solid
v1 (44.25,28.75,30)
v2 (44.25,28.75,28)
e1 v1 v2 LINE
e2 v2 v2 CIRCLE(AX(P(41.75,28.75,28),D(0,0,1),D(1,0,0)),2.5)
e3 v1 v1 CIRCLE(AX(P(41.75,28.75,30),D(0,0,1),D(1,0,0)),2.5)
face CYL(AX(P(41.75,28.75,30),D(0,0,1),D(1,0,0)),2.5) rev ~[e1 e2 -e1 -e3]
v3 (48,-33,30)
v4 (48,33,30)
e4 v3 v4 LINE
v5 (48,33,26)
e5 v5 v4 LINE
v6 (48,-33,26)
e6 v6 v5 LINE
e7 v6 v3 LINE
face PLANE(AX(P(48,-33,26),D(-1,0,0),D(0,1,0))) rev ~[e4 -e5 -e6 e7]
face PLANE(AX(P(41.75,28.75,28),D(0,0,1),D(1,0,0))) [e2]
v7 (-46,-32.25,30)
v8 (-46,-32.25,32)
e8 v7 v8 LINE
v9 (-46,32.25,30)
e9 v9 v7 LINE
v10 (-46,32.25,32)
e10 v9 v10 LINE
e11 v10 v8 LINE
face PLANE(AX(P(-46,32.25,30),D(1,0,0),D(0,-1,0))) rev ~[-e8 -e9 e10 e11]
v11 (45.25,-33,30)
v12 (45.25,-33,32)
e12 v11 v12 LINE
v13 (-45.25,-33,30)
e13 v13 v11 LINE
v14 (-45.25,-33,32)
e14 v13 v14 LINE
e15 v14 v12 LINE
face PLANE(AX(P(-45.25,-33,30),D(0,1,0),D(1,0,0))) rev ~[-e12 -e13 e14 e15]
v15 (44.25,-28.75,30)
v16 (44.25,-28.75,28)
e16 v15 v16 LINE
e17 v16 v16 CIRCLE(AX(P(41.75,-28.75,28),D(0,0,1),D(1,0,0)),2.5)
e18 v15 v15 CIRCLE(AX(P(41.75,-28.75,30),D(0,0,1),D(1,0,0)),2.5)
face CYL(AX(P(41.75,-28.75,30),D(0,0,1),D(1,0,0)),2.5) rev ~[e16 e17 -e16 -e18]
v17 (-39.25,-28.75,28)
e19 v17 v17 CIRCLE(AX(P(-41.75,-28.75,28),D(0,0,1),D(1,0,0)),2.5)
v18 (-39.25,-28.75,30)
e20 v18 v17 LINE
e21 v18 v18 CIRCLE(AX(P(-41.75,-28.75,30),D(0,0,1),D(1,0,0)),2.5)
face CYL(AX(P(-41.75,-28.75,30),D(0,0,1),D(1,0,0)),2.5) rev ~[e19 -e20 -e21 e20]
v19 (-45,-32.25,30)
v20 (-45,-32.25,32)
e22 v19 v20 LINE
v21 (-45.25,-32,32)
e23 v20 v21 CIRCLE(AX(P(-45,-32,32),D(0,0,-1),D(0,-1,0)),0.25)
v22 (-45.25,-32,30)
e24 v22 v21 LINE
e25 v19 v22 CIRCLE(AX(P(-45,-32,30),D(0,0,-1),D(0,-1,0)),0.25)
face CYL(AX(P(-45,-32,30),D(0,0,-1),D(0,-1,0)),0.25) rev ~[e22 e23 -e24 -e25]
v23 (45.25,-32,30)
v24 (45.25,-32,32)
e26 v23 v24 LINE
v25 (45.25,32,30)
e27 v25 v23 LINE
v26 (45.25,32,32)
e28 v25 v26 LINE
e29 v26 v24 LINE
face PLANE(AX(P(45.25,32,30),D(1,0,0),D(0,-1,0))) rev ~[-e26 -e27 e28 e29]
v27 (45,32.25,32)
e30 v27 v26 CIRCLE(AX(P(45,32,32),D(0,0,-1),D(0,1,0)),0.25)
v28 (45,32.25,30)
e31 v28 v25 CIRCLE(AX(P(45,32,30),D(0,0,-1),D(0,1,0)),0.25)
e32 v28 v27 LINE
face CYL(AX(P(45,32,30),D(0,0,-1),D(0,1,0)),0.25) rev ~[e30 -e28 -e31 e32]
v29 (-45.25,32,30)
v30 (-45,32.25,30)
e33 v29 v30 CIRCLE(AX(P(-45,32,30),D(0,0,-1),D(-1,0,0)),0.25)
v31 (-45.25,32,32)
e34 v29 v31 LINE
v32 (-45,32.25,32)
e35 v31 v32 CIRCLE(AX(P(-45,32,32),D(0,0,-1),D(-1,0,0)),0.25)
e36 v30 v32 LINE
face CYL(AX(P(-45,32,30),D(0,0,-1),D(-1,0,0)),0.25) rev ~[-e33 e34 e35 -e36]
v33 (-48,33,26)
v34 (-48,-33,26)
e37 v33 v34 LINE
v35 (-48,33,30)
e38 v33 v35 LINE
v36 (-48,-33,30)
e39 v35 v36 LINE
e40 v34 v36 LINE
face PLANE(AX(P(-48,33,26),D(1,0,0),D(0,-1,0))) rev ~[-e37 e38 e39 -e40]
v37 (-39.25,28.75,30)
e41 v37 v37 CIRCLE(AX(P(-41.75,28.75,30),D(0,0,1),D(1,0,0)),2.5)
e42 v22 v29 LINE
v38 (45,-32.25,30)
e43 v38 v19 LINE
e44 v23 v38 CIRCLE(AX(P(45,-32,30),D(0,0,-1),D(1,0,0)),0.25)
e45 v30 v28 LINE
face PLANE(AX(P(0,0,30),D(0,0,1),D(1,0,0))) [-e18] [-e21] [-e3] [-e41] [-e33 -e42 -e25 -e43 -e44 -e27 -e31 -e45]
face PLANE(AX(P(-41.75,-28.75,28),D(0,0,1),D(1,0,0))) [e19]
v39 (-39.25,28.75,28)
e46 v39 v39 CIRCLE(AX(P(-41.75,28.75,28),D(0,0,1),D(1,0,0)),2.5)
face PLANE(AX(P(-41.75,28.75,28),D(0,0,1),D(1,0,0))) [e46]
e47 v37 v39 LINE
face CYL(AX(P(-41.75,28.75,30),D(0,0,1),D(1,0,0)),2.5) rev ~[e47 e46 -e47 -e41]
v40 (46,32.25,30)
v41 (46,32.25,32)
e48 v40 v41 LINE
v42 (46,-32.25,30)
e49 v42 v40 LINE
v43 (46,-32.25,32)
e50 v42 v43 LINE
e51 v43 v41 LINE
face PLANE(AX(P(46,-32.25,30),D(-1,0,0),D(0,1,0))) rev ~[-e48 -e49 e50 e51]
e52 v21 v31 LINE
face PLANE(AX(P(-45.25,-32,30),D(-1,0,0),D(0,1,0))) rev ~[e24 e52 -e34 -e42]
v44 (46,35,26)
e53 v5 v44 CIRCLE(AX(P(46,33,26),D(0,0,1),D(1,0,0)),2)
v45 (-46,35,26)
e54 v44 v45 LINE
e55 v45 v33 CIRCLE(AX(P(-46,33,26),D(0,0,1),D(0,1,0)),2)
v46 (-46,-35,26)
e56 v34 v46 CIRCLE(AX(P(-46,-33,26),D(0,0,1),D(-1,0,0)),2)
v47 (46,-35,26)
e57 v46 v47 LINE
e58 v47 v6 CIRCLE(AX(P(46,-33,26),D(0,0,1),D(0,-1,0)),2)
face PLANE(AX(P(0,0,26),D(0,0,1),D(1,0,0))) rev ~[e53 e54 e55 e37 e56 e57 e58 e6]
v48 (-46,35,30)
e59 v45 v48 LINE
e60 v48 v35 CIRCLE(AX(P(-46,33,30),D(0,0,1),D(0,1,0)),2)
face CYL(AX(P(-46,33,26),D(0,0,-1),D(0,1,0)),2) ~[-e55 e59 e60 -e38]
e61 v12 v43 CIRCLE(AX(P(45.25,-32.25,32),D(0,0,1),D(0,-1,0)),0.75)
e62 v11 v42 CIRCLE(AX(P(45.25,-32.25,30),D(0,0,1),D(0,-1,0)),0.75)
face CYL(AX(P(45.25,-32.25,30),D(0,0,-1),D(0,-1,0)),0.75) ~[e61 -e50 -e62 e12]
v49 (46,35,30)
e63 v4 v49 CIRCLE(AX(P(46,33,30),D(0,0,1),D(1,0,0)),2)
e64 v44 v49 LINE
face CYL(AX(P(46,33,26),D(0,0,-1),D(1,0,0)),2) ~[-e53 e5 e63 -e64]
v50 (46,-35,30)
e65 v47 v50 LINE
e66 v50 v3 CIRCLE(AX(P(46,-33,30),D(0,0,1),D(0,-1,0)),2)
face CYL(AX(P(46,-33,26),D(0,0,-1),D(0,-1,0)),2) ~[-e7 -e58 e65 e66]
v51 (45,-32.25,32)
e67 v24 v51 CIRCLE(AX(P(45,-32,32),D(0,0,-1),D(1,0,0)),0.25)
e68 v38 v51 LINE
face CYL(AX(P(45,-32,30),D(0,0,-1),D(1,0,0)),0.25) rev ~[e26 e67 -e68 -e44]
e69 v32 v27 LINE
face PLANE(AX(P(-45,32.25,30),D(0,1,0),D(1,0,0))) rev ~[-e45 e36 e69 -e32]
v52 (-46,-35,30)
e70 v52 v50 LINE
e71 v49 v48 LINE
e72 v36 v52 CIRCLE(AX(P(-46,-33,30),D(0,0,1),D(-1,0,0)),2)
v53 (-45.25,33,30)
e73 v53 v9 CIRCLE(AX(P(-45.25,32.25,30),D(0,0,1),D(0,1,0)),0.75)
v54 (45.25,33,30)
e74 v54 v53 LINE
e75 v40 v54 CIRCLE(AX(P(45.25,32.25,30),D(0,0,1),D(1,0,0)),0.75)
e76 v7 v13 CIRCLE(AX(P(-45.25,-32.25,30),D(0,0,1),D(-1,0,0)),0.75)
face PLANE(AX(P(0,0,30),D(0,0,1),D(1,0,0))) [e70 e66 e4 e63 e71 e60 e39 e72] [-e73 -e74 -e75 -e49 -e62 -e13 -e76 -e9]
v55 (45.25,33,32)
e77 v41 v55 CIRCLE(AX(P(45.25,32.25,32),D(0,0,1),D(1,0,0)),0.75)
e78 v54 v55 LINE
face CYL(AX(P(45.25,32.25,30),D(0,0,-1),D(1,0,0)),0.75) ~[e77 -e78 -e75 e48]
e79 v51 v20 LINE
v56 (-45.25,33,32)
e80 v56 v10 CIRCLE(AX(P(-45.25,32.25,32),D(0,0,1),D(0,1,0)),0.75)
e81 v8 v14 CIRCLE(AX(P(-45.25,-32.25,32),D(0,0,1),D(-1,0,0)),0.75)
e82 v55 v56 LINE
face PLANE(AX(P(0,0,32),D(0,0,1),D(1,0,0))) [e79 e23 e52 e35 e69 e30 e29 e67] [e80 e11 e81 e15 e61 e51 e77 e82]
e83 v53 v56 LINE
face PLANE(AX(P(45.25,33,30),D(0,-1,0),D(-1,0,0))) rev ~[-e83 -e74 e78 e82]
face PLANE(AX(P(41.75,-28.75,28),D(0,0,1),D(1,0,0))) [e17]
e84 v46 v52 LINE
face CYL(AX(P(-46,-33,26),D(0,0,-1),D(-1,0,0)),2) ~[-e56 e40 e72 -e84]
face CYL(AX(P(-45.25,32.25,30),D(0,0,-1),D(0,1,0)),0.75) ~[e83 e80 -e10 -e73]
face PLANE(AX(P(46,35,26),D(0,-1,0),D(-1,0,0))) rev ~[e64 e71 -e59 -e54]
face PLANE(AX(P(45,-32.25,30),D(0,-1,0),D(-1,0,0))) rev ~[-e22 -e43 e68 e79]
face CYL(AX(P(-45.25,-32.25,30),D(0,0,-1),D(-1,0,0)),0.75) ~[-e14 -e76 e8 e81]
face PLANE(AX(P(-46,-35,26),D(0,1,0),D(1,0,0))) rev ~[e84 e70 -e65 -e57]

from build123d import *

# Parameters (mm, degrees)
F1_DEPTH  = 26
F2_DEPTH  = 4
F3_W      = 90
F3_H      = 64
F4_DEPTH  = 2
F6_DEPTH  = 2
F7_R      = 2.5
F8_DEPTH  = 2
F9_R      = 2.5
F10_DEPTH = 2
F11_W     = 5
F11_H     = 50
F11_W_2   = 76
F11_H_2   = 5
F12_DEPTH = 22
F13_R     = 1
F14_DEPTH = 5
F15_R     = 11
F15_R_2   = 5
F16_DEPTH = 2
F17_DEPTH = 5
F19_W     = 20.16
F19_H     = 11.52
F19_R     = 3
F19_R_2   = 2
F20_DEPTH = 5
F19_W_2   = 66
F19_H_2   = 18
F19_R_3   = 1.8
F21_DEPTH = 3
F22_DEPTH = 3
F19_R_4   = 0.8
F23_DEPTH = 1.9
F24_DEPTH = 1.9
F25_DEPTH = 1.9


# Not quite as in the source:
# - a feature names something its author has since deleted; it is built from what else it names


with BuildPart() as f1:
    # F0 (on Top) → F1 (new body)
    with BuildSketch(Plane.XY):
        with BuildLine():
            Line((46, 35), (-46, 35))
            ThreePointArc((-46, 35), (-47.4142135624, 34.4142135624), (-48, 33))
            Line((-48, 33), (-48, -33))
            ThreePointArc((-48, -33), (-47.4142135624, -34.4142135624), (-46, -35))
            Line((-46, -35), (46, -35))
            ThreePointArc((46, -35), (47.4142135624, -34.4142135624), (48, -33))
            Line((48, -33), (48, 33))
            ThreePointArc((48, 33), (47.4142135624, 34.4142135624), (46, 35))
        make_face()
    extrude(amount=F1_DEPTH)


with BuildPart() as f2:
    # F2 (new): a face of the model
    f2_faces = [f1.part.faces().sort_by_distance(p)[0] for p in [
        (0, 0, 26),
    ]]
    extrude(f2_faces, amount=F2_DEPTH)

    # F5 (on face) → F6 (join)
    with BuildSketch(Plane.XY.offset(30)):
        with BuildLine():
            Line((45.25, 33), (-45.25, 33))
            ThreePointArc((-45.25, 33), (-45.7803300859, 32.7803300859), (-46, 32.25))
            Line((-46, 32.25), (-46, -32.25))
            ThreePointArc((-46, -32.25), (-45.7803300859, -32.7803300859), (-45.25, -33))
            Line((-45.25, -33), (45.25, -33))
            ThreePointArc((45.25, -33), (45.7803300859, -32.7803300859), (46, -32.25))
            Line((46, -32.25), (46, 32.25))
            ThreePointArc((46, 32.25), (45.7803300859, 32.7803300859), (45.25, 33))
        make_face()
        with BuildLine():
            ThreePointArc((-45.25, 32), (-45.1767766953, 32.1767766953), (-45, 32.25))
            Line((-45, 32.25), (45, 32.25))
            ThreePointArc((45, 32.25), (45.1767766953, 32.1767766953), (45.25, 32))
            Line((45.25, 32), (45.25, -32))
            ThreePointArc((45.25, -32), (45.1767766953, -32.1767766953), (45, -32.25))
            Line((45, -32.25), (-45, -32.25))
            ThreePointArc((-45, -32.25), (-45.1767766953, -32.1767766953), (-45.25, -32))
            Line((-45.25, -32), (-45.25, 32))
        make_face(mode=Mode.SUBTRACT)
    extrude(amount=F6_DEPTH)

    # F9 (on face) → F10 (cut)
    with BuildSketch(Plane.XY.offset(30)):
        with Locations((-41.75, -28.75)):
            Circle(F9_R)
        with Locations((-41.75, 28.75)):
            Circle(F9_R)
        with Locations((41.75, 28.75)):
            Circle(F9_R)
        with Locations((41.75, -28.75)):
            Circle(F9_R)
    extrude(amount=-F10_DEPTH, mode=Mode.SUBTRACT)


with BuildPart() as f1_1:
    add(f1.part)

    # F3 (on face) → F4 (cut)
    with BuildSketch(Plane.XY.offset(26)):
        with BuildLine():
            Line((45, 33), (-45, 33))
            ThreePointArc((-45, 33), (-45.7071067812, 32.7071067812), (-46, 32))
            Line((-46, 32), (-46, -32))
            ThreePointArc((-46, -32), (-45.7071067812, -32.7071067812), (-45, -33))
            Line((-45, -33), (45, -33))
            ThreePointArc((45, -33), (45.7071067812, -32.7071067812), (46, -32))
            Line((46, -32), (46, 32))
            ThreePointArc((46, 32), (45.7071067812, 32.7071067812), (45, 33))
        make_face()
        Rectangle(F3_W, F3_H, mode=Mode.SUBTRACT)
    extrude(amount=-F4_DEPTH, mode=Mode.SUBTRACT)

    # F7 (on face) → F8 (cut)
    with BuildSketch(Plane.XY.offset(26)):
        with Locations((-41.5, -28.5)):
            Circle(F7_R)
        with Locations((-41.4999984205, 28.5)):
            Circle(F7_R)
        with Locations((41.5, 28.5)):
            Circle(F7_R)
        with Locations((41.5, -28.5)):
            Circle(F7_R)
    extrude(amount=-F8_DEPTH, mode=Mode.SUBTRACT)

    # F11 (on face) → F12 (cut)
    with BuildSketch(Plane.XY.offset(26)):
        with Locations((-40.5, 0)):
            Rectangle(F11_W, F11_H)
        with Locations((0, -27.5)):
            Rectangle(F11_W_2, F11_H_2)
        Rectangle(F11_W_2, F11_H)
        with Locations((0, 27.5)):
            Rectangle(F11_W_2, F11_H_2)
        with Locations((40.5, 0)):
            Rectangle(F11_W, F11_H)
    extrude(amount=-F12_DEPTH, mode=Mode.SUBTRACT)

    # F13 (on face) → F14 (cut, through all)
    with BuildSketch(Plane.YZ.offset(48)):
        with Locations((7.9999985173, 14.5000000224)):
            Circle(F13_R)
        with Locations((7.9999985173, 11.5000000224)):
            Circle(F13_R)
        with Locations((10.9999985173, 11.5000000224)):
            Circle(F13_R)
        with Locations((10.9999985173, 14.5000000224)):
            Circle(F13_R)
        with Locations((13.9999985173, 14.5000000224)):
            Circle(F13_R)
        with Locations((13.9999985173, 11.5000000224)):
            Circle(F13_R)
    extrude(amount=-F14_DEPTH, mode=Mode.SUBTRACT)

    # F15 (on face) → F16 (cut)
    with BuildSketch(Plane(origin=(-48, 0, 0), x_dir=(0, -1, 0), z_dir=(-1, 0, 0))):
        with Locations((6.9999988191, 12.5000002682)):
            Circle(F15_R)
        with Locations((6.9999988191, 12.5000002682)):
            Circle(F15_R_2, mode=Mode.SUBTRACT)
    extrude(amount=-F16_DEPTH, mode=Mode.SUBTRACT)

    # F15 (on face) → F17 (cut, through all)
    with BuildSketch(Plane(origin=(-48, 0, 0), x_dir=(0, -1, 0), z_dir=(-1, 0, 0))):
        with Locations((6.9999988191, 12.5000002682)):
            Circle(F15_R_2)
    extrude(amount=-F17_DEPTH, mode=Mode.SUBTRACT)

    # F19 (on face) → F20 (cut, through all)
    with BuildSketch(Plane(origin=(0, -30, 0), x_dir=(-1, 0, 0), z_dir=(0, 1, 0))):
        with Locations((4.7299169147, 14.0678631142)):
            Rectangle(F19_W, F19_H)
        with Locations((28.8399169147, 14.0678631142)):
            Circle(F19_R)
        with Locations((-11.1500830853, 14.0678631142)):
            Circle(F19_R_2)
        with Locations((-17.7100830853, 14.0678631142)):
            Circle(F19_R_2)
        with Locations((-24.2600830853, 14.0678631142)):
            Circle(F19_R_2)
        with BuildLine():
            ThreePointArc((-30.8900830853, 11.0678631142), (-30.5971898665, 10.360756333), (-29.8900830853, 10.0678631142))
            Line((-29.8900830853, 10.0678631142), (-28.9900830853, 10.0678631142))
            ThreePointArc((-28.9900830853, 10.0678631142), (-28.2829763041, 10.360756333), (-27.9900830853, 11.0678631142))
            Line((-27.9900830853, 11.0678631142), (-27.9900830853, 17.0678631142))
            ThreePointArc((-27.9900830853, 17.0678631142), (-28.2829763041, 17.7749698954), (-28.9900830853, 18.0678631142))
            Line((-28.9900830853, 18.0678631142), (-29.8900830853, 18.0678631142))
            ThreePointArc((-29.8900830853, 18.0678631142), (-30.5971898665, 17.7749698954), (-30.8900830853, 17.0678631142))
            Line((-30.8900830853, 17.0678631142), (-30.8900830853, 11.0678631142))
        make_face()
    extrude(amount=-F20_DEPTH, mode=Mode.SUBTRACT)

    # F19 (on face) → F21 (cut)
    with BuildSketch(Plane(origin=(0, -30, 0), x_dir=(-1, 0, 0), z_dir=(0, 1, 0))):
        with Locations((-0.1600830853, 14.0678631142)):
            Rectangle(F19_W_2, F19_H_2)
        with Locations((-24.0000830853, 7.5678631142)):
            Circle(F19_R_3, mode=Mode.SUBTRACT)
        with BuildLine():
            Line((-28.9900830853, 10.0678631142), (-29.8900830853, 10.0678631142))
            ThreePointArc((-29.8900830853, 10.0678631142), (-30.5971898665, 10.360756333), (-30.8900830853, 11.0678631142))
            Line((-30.8900830853, 11.0678631142), (-30.8900830853, 17.0678631142))
            ThreePointArc((-30.8900830853, 17.0678631142), (-30.5971898665, 17.7749698954), (-29.8900830853, 18.0678631142))
            Line((-29.8900830853, 18.0678631142), (-28.9900830853, 18.0678631142))
            ThreePointArc((-28.9900830853, 18.0678631142), (-28.2829763041, 17.7749698954), (-27.9900830853, 17.0678631142))
            Line((-27.9900830853, 17.0678631142), (-27.9900830853, 11.0678631142))
            ThreePointArc((-27.9900830853, 11.0678631142), (-28.2829763041, 10.360756333), (-28.9900830853, 10.0678631142))
        make_face(mode=Mode.SUBTRACT)
        with Locations((-24.2600830853, 14.0678631142)):
            Circle(F19_R_2, mode=Mode.SUBTRACT)
        with Locations((-17.7100830853, 14.0678631142)):
            Circle(F19_R_2, mode=Mode.SUBTRACT)
        with Locations((-11.1500830853, 14.0678631142)):
            Circle(F19_R_2, mode=Mode.SUBTRACT)
        with Locations((30.1799169147, 7.5678631142)):
            Circle(F19_R_3, mode=Mode.SUBTRACT)
        with Locations((4.7299169147, 14.0678631142)):
            Rectangle(F19_W, F19_H, mode=Mode.SUBTRACT)
        with Locations((28.8399169147, 14.0678631142)):
            Circle(F19_R, mode=Mode.SUBTRACT)
        with Locations((30.1799169147, 20.5678631142)):
            Circle(F19_R_3, mode=Mode.SUBTRACT)
    extrude(amount=F21_DEPTH, mode=Mode.SUBTRACT)

    # F19 (on face) → F22 (cut)
    with BuildSketch(Plane(origin=(0, -30, 0), x_dir=(-1, 0, 0), z_dir=(0, 1, 0))):
        with Locations((-0.1600830853, 14.0678631142)):
            Rectangle(F19_W_2, F19_H_2)
        with Locations((-24.0000830853, 7.5678631142)):
            Circle(F19_R_3, mode=Mode.SUBTRACT)
        with BuildLine():
            Line((-28.9900830853, 10.0678631142), (-29.8900830853, 10.0678631142))
            ThreePointArc((-29.8900830853, 10.0678631142), (-30.5971898665, 10.360756333), (-30.8900830853, 11.0678631142))
            Line((-30.8900830853, 11.0678631142), (-30.8900830853, 17.0678631142))
            ThreePointArc((-30.8900830853, 17.0678631142), (-30.5971898665, 17.7749698954), (-29.8900830853, 18.0678631142))
            Line((-29.8900830853, 18.0678631142), (-28.9900830853, 18.0678631142))
            ThreePointArc((-28.9900830853, 18.0678631142), (-28.2829763041, 17.7749698954), (-27.9900830853, 17.0678631142))
            Line((-27.9900830853, 17.0678631142), (-27.9900830853, 11.0678631142))
            ThreePointArc((-27.9900830853, 11.0678631142), (-28.2829763041, 10.360756333), (-28.9900830853, 10.0678631142))
        make_face(mode=Mode.SUBTRACT)
        with Locations((-24.2600830853, 14.0678631142)):
            Circle(F19_R_2, mode=Mode.SUBTRACT)
        with Locations((-17.7100830853, 14.0678631142)):
            Circle(F19_R_2, mode=Mode.SUBTRACT)
        with Locations((-11.1500830853, 14.0678631142)):
            Circle(F19_R_2, mode=Mode.SUBTRACT)
        with Locations((30.1799169147, 7.5678631142)):
            Circle(F19_R_3, mode=Mode.SUBTRACT)
        with Locations((4.7299169147, 14.0678631142)):
            Rectangle(F19_W, F19_H, mode=Mode.SUBTRACT)
        with Locations((28.8399169147, 14.0678631142)):
            Circle(F19_R, mode=Mode.SUBTRACT)
        with Locations((30.1799169147, 20.5678631142)):
            Circle(F19_R_3, mode=Mode.SUBTRACT)
    extrude(amount=-F22_DEPTH, mode=Mode.SUBTRACT)

    # F19 (on face) → F23 (join)
    with BuildSketch(Plane(origin=(0, -30, 0), x_dir=(-1, 0, 0), z_dir=(0, 1, 0))):
        with Locations((30.1799169147, 20.5678631142)):
            Circle(F19_R_3)
        with Locations((30.1799169147, 20.5678631142)):
            Circle(F19_R_4, mode=Mode.SUBTRACT)
    extrude(amount=F23_DEPTH)

    # F19 (on face) → F24 (join)
    with BuildSketch(Plane(origin=(0, -30, 0), x_dir=(-1, 0, 0), z_dir=(0, 1, 0))):
        with Locations((30.1799169147, 7.5678631142)):
            Circle(F19_R_3)
        with Locations((30.1799169147, 7.5678631142)):
            Circle(F19_R_4, mode=Mode.SUBTRACT)
    extrude(amount=F24_DEPTH)

    # F19 (on face) → F25 (join)
    with BuildSketch(Plane(origin=(0, -30, 0), x_dir=(-1, 0, 0), z_dir=(0, 1, 0))):
        with Locations((-24.0000830853, 7.5678631142)):
            Circle(F19_R_3)
        with Locations((-24.0000830853, 7.5678631142)):
            Circle(F19_R_4, mode=Mode.SUBTRACT)
    extrude(amount=F25_DEPTH)


with BuildPart() as f27_1:
    # F27: copy of F2
    add(f2.part)


with BuildPart() as f29_1:
    # F29: copy of F2
    add(f2.part)


solid = f2.part
